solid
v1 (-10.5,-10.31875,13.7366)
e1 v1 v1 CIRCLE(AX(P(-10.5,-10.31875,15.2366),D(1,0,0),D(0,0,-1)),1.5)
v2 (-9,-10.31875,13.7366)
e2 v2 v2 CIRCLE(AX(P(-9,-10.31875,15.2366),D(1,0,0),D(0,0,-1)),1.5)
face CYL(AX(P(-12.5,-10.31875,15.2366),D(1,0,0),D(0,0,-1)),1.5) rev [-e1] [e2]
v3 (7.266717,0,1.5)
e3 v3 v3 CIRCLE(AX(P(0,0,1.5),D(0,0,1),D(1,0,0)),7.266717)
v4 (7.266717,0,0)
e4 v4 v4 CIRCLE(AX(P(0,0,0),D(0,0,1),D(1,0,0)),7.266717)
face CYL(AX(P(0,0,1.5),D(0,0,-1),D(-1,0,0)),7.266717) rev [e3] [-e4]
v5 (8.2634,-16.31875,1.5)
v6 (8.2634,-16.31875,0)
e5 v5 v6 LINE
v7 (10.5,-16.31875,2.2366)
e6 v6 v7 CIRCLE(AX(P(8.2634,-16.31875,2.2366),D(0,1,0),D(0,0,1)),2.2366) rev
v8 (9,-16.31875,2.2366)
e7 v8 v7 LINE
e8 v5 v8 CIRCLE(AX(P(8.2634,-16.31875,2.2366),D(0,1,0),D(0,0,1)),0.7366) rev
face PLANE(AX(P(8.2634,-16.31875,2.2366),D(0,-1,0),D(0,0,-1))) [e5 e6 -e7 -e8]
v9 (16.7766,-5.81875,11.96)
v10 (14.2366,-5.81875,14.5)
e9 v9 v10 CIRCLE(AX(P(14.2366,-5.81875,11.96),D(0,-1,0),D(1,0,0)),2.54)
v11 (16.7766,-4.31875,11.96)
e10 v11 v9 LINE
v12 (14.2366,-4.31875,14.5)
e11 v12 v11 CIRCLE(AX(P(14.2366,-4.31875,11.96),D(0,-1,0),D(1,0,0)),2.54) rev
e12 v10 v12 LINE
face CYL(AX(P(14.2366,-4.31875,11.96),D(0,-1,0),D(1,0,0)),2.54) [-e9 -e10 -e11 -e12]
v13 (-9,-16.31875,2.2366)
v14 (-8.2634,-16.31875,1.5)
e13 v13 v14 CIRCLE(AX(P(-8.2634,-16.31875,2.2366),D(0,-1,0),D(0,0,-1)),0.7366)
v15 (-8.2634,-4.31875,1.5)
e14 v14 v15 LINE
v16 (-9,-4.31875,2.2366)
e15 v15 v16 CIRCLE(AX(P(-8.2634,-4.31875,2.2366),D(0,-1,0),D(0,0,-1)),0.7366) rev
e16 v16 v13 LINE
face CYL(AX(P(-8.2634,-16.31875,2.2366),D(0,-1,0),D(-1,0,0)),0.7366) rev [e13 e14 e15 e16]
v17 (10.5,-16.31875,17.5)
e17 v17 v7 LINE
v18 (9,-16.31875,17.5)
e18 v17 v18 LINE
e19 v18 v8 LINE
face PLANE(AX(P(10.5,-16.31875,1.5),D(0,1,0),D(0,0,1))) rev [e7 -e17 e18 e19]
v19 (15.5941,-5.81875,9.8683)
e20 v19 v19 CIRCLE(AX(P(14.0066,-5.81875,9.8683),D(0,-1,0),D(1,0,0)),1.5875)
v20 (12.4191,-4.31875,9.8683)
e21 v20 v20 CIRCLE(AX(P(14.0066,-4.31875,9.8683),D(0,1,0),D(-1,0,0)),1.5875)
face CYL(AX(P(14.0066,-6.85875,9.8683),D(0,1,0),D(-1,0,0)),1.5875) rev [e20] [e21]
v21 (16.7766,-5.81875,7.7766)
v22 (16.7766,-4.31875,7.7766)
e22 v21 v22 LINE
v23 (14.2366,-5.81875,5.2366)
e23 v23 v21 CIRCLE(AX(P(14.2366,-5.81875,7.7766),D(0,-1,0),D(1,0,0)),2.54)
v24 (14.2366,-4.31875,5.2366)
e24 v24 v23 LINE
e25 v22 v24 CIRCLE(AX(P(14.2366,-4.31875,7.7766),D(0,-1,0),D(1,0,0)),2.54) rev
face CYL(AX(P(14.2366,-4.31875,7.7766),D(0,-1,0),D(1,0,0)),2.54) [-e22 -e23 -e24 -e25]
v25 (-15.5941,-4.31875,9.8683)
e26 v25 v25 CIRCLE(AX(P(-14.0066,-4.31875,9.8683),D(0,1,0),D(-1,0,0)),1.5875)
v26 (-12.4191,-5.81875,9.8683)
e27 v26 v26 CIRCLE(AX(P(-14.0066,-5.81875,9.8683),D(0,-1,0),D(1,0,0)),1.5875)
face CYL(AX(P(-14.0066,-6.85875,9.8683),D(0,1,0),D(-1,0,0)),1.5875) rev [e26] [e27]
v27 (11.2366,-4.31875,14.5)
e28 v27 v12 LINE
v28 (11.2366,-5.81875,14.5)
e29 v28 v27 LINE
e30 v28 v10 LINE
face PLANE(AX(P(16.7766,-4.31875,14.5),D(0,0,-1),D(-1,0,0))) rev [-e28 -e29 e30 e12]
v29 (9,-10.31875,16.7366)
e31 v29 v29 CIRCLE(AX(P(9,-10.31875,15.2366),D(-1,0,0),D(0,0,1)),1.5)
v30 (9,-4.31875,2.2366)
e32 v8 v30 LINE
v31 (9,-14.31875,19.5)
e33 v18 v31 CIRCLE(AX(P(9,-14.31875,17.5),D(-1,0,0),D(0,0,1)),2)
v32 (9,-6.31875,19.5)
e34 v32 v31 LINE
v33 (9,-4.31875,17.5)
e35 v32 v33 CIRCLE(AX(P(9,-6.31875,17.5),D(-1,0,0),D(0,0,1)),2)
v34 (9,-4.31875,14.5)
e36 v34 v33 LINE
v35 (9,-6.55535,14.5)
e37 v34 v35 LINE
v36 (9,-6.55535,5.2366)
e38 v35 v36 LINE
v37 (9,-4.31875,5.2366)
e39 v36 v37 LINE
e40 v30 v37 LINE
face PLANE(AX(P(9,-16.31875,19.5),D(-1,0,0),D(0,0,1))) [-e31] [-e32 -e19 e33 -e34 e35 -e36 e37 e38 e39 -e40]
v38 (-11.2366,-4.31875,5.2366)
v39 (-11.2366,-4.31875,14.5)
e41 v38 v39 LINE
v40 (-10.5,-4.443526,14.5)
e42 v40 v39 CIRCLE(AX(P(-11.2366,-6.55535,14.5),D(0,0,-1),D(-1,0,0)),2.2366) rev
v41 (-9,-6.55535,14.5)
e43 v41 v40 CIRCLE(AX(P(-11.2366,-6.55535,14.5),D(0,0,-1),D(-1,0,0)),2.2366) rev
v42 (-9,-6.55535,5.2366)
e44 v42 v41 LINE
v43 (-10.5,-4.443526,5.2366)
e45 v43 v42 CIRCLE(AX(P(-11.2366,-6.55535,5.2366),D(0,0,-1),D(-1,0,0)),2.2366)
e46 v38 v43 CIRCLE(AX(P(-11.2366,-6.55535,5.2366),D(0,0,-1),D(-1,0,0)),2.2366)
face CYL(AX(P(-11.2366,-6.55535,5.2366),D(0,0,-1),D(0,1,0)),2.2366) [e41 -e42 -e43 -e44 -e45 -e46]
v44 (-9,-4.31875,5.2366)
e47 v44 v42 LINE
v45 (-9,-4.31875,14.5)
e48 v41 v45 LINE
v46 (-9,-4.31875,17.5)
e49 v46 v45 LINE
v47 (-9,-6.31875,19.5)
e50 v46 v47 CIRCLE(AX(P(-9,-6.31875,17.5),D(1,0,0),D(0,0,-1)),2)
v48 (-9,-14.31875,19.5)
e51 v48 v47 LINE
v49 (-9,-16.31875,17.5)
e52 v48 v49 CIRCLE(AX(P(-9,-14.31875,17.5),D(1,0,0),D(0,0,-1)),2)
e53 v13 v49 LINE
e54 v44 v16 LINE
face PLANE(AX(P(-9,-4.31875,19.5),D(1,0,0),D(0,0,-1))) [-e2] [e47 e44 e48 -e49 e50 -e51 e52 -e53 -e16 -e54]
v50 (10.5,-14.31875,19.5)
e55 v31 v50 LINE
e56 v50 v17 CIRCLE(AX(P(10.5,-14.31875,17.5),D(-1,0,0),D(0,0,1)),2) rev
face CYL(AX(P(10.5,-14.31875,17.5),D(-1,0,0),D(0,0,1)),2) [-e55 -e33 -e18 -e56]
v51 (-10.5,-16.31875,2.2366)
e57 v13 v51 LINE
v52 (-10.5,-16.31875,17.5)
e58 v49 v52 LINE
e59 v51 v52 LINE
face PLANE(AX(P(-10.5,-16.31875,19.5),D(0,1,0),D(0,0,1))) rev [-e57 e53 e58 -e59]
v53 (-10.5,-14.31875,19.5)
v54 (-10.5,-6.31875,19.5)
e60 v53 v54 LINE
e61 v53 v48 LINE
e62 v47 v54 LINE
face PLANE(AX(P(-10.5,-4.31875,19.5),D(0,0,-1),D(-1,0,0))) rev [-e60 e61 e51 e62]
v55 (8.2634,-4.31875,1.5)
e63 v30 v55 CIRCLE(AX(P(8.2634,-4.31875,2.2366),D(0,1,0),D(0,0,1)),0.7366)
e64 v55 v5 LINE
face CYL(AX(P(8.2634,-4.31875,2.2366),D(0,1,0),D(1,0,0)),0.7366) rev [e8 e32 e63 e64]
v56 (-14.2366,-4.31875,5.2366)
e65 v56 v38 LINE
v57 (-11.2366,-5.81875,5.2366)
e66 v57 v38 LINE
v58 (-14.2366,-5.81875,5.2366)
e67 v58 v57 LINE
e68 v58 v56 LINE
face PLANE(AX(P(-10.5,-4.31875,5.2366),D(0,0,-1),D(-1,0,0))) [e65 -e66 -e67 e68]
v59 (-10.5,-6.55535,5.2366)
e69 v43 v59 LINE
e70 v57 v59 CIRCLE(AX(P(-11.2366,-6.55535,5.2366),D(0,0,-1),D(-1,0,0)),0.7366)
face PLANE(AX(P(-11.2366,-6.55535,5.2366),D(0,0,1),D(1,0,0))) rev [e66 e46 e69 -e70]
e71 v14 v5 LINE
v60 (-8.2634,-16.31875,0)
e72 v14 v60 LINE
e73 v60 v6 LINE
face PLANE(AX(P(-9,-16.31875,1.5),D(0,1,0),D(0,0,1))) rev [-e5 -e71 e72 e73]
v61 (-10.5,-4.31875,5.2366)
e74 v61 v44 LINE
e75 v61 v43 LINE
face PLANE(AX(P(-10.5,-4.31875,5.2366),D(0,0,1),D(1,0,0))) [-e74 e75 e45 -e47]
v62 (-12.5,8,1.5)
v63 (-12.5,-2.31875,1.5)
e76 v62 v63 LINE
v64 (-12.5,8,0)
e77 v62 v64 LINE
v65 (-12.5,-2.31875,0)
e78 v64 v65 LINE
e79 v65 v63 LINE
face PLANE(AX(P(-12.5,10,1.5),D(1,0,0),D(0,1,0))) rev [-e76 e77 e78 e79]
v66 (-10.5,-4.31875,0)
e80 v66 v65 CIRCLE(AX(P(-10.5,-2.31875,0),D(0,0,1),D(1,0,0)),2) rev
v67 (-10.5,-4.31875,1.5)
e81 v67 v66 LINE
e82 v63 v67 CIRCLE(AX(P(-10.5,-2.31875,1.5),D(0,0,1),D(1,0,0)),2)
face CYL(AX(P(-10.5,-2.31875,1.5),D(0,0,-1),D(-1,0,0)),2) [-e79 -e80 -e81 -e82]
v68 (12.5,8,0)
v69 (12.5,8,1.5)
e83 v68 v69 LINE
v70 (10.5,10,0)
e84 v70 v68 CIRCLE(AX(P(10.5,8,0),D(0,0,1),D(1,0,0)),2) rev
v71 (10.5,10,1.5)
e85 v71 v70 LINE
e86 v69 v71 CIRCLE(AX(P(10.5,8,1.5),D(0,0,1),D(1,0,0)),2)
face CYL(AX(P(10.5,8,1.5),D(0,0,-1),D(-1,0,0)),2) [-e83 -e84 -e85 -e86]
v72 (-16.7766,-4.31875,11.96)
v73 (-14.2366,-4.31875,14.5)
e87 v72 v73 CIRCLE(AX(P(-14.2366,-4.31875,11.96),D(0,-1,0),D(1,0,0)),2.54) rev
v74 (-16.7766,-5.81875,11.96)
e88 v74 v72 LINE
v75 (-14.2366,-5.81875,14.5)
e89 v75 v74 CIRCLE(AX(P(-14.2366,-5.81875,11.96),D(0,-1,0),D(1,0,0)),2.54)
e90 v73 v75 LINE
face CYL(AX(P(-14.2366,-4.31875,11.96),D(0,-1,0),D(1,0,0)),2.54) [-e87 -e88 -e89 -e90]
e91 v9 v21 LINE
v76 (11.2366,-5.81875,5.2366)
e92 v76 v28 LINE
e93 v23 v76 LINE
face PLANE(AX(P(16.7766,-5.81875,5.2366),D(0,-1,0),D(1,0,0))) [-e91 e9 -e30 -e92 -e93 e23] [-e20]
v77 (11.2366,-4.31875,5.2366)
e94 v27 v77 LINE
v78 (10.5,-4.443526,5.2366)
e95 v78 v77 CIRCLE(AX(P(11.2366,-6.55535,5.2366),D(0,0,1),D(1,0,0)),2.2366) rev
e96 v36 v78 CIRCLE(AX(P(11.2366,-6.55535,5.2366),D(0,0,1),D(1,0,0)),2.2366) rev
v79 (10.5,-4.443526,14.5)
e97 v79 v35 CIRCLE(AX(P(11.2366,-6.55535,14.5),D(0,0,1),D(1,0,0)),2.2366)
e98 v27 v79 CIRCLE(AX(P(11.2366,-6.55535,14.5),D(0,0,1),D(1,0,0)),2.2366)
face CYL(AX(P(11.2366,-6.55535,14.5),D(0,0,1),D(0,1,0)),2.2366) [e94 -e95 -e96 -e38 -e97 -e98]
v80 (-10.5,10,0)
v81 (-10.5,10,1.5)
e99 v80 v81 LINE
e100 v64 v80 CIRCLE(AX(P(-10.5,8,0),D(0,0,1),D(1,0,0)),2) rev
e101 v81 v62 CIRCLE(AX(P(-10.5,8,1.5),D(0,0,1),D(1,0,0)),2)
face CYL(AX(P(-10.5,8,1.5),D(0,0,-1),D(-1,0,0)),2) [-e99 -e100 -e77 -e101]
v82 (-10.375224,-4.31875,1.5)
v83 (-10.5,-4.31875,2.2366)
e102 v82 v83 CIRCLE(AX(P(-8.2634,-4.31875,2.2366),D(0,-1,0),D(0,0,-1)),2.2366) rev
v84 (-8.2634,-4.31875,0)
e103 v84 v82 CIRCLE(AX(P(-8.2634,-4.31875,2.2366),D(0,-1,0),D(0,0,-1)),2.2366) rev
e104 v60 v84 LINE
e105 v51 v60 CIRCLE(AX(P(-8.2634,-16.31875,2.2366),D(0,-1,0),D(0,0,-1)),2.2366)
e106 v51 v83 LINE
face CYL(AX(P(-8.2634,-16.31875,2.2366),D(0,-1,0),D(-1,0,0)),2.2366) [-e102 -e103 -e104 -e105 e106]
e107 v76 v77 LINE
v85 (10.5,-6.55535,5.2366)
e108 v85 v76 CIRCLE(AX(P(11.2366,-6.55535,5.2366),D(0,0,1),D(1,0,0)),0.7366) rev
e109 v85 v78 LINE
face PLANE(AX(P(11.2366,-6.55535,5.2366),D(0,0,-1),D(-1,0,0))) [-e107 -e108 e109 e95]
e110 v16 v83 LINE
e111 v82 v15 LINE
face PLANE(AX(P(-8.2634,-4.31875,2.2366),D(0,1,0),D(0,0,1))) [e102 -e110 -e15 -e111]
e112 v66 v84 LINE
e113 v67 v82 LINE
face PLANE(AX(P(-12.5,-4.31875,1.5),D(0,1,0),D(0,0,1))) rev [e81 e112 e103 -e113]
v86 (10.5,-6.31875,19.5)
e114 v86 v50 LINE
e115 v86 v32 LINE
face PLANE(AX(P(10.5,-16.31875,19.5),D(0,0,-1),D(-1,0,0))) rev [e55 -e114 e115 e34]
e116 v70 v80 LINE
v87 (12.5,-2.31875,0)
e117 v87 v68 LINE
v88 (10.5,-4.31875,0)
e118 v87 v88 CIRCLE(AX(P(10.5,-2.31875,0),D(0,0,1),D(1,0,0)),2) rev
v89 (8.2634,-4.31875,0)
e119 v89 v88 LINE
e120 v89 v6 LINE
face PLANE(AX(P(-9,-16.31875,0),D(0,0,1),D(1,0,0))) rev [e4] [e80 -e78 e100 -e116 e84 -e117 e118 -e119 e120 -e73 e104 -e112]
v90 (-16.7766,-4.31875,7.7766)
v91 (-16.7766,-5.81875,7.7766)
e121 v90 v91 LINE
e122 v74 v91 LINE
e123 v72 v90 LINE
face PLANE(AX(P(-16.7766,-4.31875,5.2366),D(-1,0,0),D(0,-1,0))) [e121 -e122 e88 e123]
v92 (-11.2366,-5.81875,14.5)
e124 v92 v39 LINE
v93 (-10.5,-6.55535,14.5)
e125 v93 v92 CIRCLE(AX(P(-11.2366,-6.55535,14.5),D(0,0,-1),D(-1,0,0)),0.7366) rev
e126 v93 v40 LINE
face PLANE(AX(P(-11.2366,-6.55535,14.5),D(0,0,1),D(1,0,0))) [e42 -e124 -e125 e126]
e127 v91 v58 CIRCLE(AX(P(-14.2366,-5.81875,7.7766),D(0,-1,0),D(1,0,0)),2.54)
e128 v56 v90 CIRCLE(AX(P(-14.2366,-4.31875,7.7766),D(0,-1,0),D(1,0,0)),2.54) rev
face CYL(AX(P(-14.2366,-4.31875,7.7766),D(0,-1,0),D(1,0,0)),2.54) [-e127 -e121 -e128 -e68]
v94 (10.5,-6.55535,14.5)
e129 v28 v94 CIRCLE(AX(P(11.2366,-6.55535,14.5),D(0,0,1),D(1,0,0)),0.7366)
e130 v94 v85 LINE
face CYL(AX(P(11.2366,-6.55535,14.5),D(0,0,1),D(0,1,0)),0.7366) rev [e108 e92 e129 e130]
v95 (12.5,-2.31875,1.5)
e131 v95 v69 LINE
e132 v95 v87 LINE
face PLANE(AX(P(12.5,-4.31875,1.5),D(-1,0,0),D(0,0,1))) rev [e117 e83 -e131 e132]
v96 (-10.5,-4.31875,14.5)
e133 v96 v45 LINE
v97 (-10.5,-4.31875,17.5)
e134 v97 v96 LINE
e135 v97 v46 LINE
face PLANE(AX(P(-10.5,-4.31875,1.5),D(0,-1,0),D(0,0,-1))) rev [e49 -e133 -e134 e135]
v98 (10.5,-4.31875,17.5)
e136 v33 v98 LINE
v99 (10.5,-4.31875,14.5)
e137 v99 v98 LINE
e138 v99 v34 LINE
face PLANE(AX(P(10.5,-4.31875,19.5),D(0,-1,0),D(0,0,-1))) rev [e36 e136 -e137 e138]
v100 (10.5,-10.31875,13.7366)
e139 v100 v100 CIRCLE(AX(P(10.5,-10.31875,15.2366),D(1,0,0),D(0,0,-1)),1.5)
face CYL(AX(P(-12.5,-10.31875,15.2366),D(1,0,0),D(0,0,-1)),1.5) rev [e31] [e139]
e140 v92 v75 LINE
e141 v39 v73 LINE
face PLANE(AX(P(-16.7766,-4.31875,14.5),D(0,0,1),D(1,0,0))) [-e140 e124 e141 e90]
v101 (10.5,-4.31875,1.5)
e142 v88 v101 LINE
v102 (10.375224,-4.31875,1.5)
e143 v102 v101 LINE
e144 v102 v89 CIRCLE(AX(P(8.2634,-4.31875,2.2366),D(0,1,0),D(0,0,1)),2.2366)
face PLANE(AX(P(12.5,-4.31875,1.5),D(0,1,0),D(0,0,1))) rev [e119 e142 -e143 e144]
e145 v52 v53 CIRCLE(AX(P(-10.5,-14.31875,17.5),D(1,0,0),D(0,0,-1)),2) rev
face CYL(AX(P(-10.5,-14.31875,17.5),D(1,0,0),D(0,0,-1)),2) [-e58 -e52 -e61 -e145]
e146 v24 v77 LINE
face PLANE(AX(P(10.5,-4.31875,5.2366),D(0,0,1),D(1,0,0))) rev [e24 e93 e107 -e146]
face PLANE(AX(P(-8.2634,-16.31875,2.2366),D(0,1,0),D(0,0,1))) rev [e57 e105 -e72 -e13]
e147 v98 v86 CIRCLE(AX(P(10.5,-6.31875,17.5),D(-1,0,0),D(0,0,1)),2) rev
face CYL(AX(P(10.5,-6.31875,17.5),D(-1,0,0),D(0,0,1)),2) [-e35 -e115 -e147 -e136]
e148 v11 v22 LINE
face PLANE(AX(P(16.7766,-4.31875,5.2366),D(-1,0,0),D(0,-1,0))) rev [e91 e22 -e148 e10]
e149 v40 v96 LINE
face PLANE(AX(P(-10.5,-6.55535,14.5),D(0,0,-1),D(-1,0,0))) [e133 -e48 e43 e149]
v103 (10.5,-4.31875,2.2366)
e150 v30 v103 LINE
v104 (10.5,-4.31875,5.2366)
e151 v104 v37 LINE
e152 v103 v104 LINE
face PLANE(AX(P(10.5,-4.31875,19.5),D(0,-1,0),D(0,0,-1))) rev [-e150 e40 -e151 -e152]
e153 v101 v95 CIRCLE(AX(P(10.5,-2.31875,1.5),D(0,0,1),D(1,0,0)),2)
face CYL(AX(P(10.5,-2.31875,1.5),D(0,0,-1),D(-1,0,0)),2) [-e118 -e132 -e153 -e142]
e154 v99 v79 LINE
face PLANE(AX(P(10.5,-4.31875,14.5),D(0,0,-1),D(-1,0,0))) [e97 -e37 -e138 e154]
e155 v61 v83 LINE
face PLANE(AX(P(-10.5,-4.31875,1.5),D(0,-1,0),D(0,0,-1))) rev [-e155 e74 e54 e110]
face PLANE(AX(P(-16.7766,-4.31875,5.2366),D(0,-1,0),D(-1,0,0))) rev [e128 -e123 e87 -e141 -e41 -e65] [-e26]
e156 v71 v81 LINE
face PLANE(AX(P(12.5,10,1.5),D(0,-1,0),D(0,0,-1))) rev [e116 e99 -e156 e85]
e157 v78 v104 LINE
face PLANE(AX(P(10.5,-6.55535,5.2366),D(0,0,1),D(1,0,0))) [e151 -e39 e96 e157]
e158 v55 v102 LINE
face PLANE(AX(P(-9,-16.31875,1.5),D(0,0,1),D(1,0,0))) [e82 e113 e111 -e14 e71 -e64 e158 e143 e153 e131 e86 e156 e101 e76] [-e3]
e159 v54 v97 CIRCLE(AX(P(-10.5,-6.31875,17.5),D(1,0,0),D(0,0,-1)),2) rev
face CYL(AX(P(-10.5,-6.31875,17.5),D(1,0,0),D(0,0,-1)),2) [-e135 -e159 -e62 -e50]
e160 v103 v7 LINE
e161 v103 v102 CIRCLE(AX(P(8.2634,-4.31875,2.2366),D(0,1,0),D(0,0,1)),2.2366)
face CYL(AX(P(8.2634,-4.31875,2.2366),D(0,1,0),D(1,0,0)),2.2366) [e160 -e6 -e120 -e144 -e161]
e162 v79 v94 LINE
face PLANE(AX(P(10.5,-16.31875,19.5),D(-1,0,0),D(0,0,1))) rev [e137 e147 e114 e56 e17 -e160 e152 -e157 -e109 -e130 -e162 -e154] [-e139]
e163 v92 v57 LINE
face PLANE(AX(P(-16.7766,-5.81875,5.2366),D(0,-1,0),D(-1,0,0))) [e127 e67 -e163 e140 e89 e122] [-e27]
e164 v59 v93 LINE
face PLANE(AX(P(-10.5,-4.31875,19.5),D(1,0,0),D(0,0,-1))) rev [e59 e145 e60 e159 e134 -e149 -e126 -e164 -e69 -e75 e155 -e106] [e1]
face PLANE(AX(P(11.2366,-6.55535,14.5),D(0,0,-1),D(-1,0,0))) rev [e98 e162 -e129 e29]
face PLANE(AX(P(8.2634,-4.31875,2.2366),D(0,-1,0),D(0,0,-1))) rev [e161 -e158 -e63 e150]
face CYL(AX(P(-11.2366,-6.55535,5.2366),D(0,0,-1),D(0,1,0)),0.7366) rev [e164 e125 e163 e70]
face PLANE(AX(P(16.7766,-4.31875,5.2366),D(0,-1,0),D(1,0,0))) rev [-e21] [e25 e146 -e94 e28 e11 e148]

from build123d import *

# Parameters (mm, degrees)
SKETCH1_R                      = 7.266716582
BASE_FLANGE1_DEPTH             = 1.5
EDGE_FLANGE1_STRIP_W           = 7.4732
EDGE_FLANGE1_STRIP_H           = 1.5
EDGE_FLANGE1_STRIP_CUT_DEPTH   = 12
EDGE_FLANGE1_STRIP_2_W         = 7.4732
EDGE_FLANGE1_STRIP_2_H         = 1.5
EDGE_FLANGE1_STRIP_CUT_2_DEPTH = 12
EDGE_FLANGE1_DEPTH             = 12
EDGE_FLANGE1_BEND_DEPTH        = 12
SKETCH9_R                      = 1.5
CUT_EXTRUDE1_DEPTH             = 35.286317994
FILLET1_R                      = 2
EDGE_FLANGE3_STRIP_W           = 7.4732
EDGE_FLANGE3_STRIP_H           = 1.5
EDGE_FLANGE3_STRIP_CUT_DEPTH   = 9.2634
EDGE_FLANGE3_DEPTH             = 9.2634
FILLET2_R                      = 2.54
FILLET2_OF_MIRROR1_R           = 2.54
SKETCH20_R                     = 1.5875
CUT_EXTRUDE3_DEPTH             = 2.54


# Sheet-metal steps are written as plain solids
with BuildPart() as part:
    # Sketch1 → Base-Flange1 (new body)
    with BuildSketch(Plane.XY):
        Polygon((-9, -16.31875), (9, -16.31875), (9, -4.31875), (12.5, -4.31875), (12.5, 10), (-12.5, 10), (-12.5, -4.31875), (-9, -4.31875), align=None)
        Circle(SKETCH1_R, mode=Mode.SUBTRACT)
    extrude(amount=BASE_FLANGE1_DEPTH)

    # Edge-Flange1 strip (across the edge) → Edge-Flange1 strip cut (cut)
    with BuildSketch(Plane(origin=(-9, -4.31875, 1.5), x_dir=(1, 0, 0), z_dir=(0, -1, 0))):
        with Locations((-3, -0.75)):
            Rectangle(EDGE_FLANGE1_STRIP_W, EDGE_FLANGE1_STRIP_H)
    extrude(amount=EDGE_FLANGE1_STRIP_CUT_DEPTH, mode=Mode.SUBTRACT)

    # Edge-Flange1 strip 2 (across the edge) → Edge-Flange1 strip cut 2 (cut)
    with BuildSketch(Plane(origin=(9, -16.31875, 1.5), x_dir=(-1, 0, 0), z_dir=(0, 1, 0))):
        with Locations((-3, -0.75)):
            Rectangle(EDGE_FLANGE1_STRIP_2_W, EDGE_FLANGE1_STRIP_2_H)
    extrude(amount=EDGE_FLANGE1_STRIP_CUT_2_DEPTH, mode=Mode.SUBTRACT)

    # Edge-Flange1 section (across the edge) → Edge-Flange1 (add)
    with BuildSketch(Plane(origin=(-9, -4.31875, 1.5), x_dir=(1, 0, 0), z_dir=(0, -1, 0))):
        with BuildLine():
            Line((-1.5, 0.7366), (-1.5, 18))
            Line((-1.5, 18), (0, 18))
            Line((0, 18), (0, 0.7366))
            ThreePointArc((0, 0.7366), (0.215745145, 0.215745145), (0.7366, 0))
            Line((0.7366, 0), (0.7366, -1.5))
            ThreePointArc((0.7366, -1.5), (-0.844915027, -0.844915027), (-1.5, 0.7366))
        make_face()
    extrude(amount=EDGE_FLANGE1_DEPTH)

    # Edge-Flange1 section 2 (across the edge) → Edge-Flange1 bend (add)
    with BuildSketch(Plane(origin=(9, -16.31875, 1.5), x_dir=(-1, 0, 0), z_dir=(0, 1, 0))):
        with BuildLine():
            Line((-1.5, 0.7366), (-1.5, 18))
            Line((-1.5, 18), (0, 18))
            Line((0, 18), (0, 0.7366))
            ThreePointArc((0, 0.7366), (0.215745145, 0.215745145), (0.7366, 0))
            Line((0.7366, 0), (0.7366, -1.5))
            ThreePointArc((0.7366, -1.5), (-0.844915027, -0.844915027), (-1.5, 0.7366))
        make_face()
    extrude(amount=EDGE_FLANGE1_BEND_DEPTH)

    # Sketch9 → Cut-Extrude1 (cut, through all)
    with BuildSketch(Plane(origin=(10.5, 0, 0), x_dir=(0, 0, -1), z_dir=(1, 0, 0))):
        with Locations((-15.2366, -10.31875)):
            Circle(SKETCH9_R)
    extrude(amount=-CUT_EXTRUDE1_DEPTH, mode=Mode.SUBTRACT)

    # Fillet1
    fillet1_edges = [part.edges().sort_by_distance(p)[0] for p in [
        (-12.5, -4.31875, 0.75),
        (-12.5, 10, 0.75),
        (12.5, 10, 0.75),
        (12.5, -4.31875, 0.75),
        (-9.75, -4.31875, 19.5),
        (-9.75, -16.31875, 19.5),
        (9.75, -16.31875, 19.5),
        (9.75, -4.31875, 19.5),
    ]]
    fillet(fillet1_edges, radius=FILLET1_R)

    # Edge-Flange3 strip (across the edge) → Edge-Flange3 strip cut (cut)
    with BuildSketch(Plane(origin=(10.5, -4.31875, 5.2366), x_dir=(0, -1, 0), z_dir=(0, 0, 1))):
        with Locations((-1.5, -0.75)):
            Rectangle(EDGE_FLANGE3_STRIP_W, EDGE_FLANGE3_STRIP_H)
    edge_flange3_strip_cut = extrude(amount=EDGE_FLANGE3_STRIP_CUT_DEPTH, mode=Mode.SUBTRACT)

    # Edge-Flange3 section (across the edge) → Edge-Flange3 (add)
    with BuildSketch(Plane(origin=(10.5, -4.31875, 5.2366), x_dir=(0, -1, 0), z_dir=(0, 0, 1))):
        with BuildLine():
            Line((0, 0.7366), (0, 6.2766))
            Line((0, 6.2766), (1.5, 6.2766))
            Line((1.5, 6.2766), (1.5, 0.7366))
            ThreePointArc((1.5, 0.7366), (1.715745145, 0.215745145), (2.2366, 0))
            Line((2.2366, 0), (2.2366, -1.5))
            ThreePointArc((2.2366, -1.5), (0.655084973, -0.844915027), (0, 0.7366))
        make_face()
    edge_flange3 = extrude(amount=EDGE_FLANGE3_DEPTH)

    # Fillet2
    fillet2_edges = [part.edges().sort_by_distance(p)[0] for p in [
        (16.7766, -5.06875, 5.2366),
        (16.7766, -5.06875, 14.5),
    ]]
    fillet(fillet2_edges, radius=FILLET2_R)

    # Mirror1: Edge-Flange3 strip cut, Edge-Flange3 across plane
    add(edge_flange3_strip_cut.mirror(Plane(origin=(0, 0, 0), x_dir=(0, 0, 1), z_dir=(1, 0, 0))), mode=Mode.SUBTRACT)
    add(edge_flange3.mirror(Plane(origin=(0, 0, 0), x_dir=(0, 0, 1), z_dir=(1, 0, 0))))

    # Fillet2 of Mirror1
    fillet2_of_mirror1_edges = [part.edges().sort_by_distance(p)[0] for p in [
        (-16.7766, -5.06875, 5.2366),
        (-16.7766, -5.06875, 14.5),
    ]]
    fillet(fillet2_of_mirror1_edges, radius=FILLET2_OF_MIRROR1_R)

    # Sketch20 → Cut-Extrude3 (cut)
    with BuildSketch(Plane(origin=(0, -4.31875, 0), x_dir=(1, 0, 0), z_dir=(0, 1, 0))):
        with Locations(Location((14.0066, -9.8683, 0), (0, 0, 180))):
            Circle(SKETCH20_R)
        with Locations(Location((-14.0066, -9.8683, 0), (0, 0, 180))):
            Circle(SKETCH20_R)
    extrude(amount=-CUT_EXTRUDE3_DEPTH, mode=Mode.SUBTRACT)


solid = part.part
